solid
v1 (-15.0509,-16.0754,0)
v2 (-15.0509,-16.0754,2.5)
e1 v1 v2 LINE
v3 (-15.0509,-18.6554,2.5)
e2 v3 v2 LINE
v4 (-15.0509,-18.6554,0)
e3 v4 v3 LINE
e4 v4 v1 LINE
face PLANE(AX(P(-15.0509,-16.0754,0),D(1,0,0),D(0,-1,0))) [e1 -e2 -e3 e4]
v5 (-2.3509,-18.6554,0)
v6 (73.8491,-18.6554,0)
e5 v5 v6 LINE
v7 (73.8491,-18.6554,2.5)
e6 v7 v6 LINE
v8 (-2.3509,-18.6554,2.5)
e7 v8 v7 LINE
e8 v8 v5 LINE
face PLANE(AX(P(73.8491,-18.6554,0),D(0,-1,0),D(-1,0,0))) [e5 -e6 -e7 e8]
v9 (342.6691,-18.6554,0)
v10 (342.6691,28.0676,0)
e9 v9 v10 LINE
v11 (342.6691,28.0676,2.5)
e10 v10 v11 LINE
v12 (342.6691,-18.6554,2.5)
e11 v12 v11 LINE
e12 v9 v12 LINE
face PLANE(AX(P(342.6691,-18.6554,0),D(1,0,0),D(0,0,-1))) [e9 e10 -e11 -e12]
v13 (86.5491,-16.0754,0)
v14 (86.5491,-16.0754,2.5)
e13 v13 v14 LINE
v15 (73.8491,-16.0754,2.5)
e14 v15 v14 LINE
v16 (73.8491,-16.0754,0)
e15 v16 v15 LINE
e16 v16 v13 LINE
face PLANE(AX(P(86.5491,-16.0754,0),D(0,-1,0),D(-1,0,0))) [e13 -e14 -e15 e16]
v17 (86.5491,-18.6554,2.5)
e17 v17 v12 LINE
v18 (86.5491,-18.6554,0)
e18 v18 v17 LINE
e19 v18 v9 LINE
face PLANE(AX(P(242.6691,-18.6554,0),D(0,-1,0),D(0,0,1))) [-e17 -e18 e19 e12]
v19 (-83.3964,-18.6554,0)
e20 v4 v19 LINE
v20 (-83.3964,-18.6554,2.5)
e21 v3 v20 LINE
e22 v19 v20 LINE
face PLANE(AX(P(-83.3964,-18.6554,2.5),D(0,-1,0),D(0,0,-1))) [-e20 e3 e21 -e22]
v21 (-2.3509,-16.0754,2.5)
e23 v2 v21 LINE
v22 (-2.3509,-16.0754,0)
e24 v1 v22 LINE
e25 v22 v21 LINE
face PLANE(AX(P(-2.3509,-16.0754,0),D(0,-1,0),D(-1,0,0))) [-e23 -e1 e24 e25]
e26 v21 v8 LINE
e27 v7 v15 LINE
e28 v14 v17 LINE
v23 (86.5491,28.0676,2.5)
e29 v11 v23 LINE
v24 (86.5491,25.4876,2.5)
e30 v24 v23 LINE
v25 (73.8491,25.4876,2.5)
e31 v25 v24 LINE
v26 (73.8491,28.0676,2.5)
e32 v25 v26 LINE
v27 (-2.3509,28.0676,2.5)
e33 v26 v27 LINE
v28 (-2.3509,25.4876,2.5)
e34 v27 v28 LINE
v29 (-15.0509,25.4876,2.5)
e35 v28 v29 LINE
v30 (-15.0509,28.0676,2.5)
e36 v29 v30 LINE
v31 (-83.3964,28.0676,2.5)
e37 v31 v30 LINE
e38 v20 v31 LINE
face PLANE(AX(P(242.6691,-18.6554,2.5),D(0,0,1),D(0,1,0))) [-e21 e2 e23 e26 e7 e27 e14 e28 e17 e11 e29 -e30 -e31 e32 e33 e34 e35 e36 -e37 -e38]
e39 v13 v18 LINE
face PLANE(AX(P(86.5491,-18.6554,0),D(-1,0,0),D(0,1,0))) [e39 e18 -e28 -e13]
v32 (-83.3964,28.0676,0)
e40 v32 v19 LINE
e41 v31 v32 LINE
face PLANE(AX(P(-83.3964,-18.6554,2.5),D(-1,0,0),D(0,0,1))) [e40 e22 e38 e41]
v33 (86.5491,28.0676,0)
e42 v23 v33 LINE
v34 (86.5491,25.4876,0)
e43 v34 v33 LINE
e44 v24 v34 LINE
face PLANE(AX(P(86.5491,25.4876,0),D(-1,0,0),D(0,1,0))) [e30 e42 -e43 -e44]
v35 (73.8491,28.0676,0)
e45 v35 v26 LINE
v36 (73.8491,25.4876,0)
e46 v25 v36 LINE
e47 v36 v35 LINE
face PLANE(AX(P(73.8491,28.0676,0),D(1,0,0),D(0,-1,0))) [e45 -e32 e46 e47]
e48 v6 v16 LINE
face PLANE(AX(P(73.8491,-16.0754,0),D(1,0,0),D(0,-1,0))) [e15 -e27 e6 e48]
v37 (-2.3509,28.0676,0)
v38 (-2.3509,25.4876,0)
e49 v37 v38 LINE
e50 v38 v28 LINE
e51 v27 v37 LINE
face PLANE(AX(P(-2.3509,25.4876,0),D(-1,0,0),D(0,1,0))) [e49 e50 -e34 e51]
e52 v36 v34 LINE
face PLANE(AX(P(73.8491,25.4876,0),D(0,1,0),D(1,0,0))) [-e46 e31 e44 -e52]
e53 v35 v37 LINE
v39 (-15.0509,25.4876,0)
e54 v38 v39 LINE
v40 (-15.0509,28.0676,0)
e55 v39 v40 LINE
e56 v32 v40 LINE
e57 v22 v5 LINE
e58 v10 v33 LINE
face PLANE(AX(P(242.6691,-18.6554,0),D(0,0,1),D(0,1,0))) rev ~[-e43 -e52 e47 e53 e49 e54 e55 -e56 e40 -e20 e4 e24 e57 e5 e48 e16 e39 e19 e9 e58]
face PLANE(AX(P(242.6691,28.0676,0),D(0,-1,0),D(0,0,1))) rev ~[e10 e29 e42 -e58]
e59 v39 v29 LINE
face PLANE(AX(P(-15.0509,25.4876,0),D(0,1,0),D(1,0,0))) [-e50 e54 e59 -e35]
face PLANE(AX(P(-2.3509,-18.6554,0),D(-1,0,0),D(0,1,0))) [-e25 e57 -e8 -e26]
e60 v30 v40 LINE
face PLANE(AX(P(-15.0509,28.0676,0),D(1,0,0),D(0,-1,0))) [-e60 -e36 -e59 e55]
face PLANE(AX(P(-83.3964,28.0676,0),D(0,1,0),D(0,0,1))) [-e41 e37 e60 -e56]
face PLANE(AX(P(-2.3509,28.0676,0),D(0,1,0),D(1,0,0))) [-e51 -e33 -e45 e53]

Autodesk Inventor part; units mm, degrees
ref_plane "YZ Plane" through (0, 0, 0) normal (1, 0, 0) x (0, 1, 0)
ref_plane "XZ Plane" through (0, 0, 0) normal (0, 1, 0) x (-1, 0, 0)
ref_plane "XY Plane" through (0, 0, 0) normal (0, 0, 1) x (1, 0, 0)
sketch "Sketch1" plane through (0, 0, 0) normal (0, 0, 1) x (1, 0, 0)
  line L0 (86.5491, 25.4876) -> (86.5491, 28.0676)
  line L1 (86.5491, 28.0676) -> (86.5491, 25.4876)
  line L2 (73.8491, 25.4876) -> (86.5491, 25.4876)
  line L3 (86.5491, 25.4876) -> (73.8491, 25.4876)
  line L4 (86.5491, 28.0676) -> (217.6691, 28.0676)
  line L5 (217.6691, 28.0676) -> (86.5491, 28.0676)
  line L6 (217.6691, 28.0676) -> (217.6691, -18.6554)
  line L7 (217.6691, -18.6554) -> (217.6691, 28.0676)
  line L8 (86.5491, -18.6554) -> (217.6691, -18.6554)
  line L9 (217.6691, -18.6554) -> (86.5491, -18.6554)
  line L10 (-230.8205, -18.6554) -> (-230.8205, 28.0676)
  line L11 (-230.8205, 28.0676) -> (-230.8205, -18.6554)
  line L12 (-230.8205, 28.0676) -> (-230.8205, -18.6554)
  line L13 (-230.8205, -18.6554) -> (-230.8205, 28.0676)
  line L14 (-15.0509, -16.0754) -> (-15.0509, -18.6554)
  line L15 (-15.0509, -18.6554) -> (-15.0509, -16.0754)
  line L16 (-2.3509, 25.4876) -> (-2.3509, 28.0676)
  line L17 (-2.3509, 28.0676) -> (-2.3509, 25.4876)
  line L18 (-15.0509, 25.4876) -> (-2.3509, 25.4876)
  line L19 (-2.3509, 25.4876) -> (-15.0509, 25.4876)
  line L20 (-15.0509, 28.0676) -> (-15.0509, 25.4876)
  line L21 (-15.0509, 25.4876) -> (-15.0509, 28.0676)
  line L22 (-2.3509, -16.0754) -> (-15.0509, -16.0754)
  line L23 (-15.0509, -16.0754) -> (-2.3509, -16.0754)
  line L24 (-15.0509, 25.4876) -> (-15.0509, 28.0676)
  line L25 (-15.0509, 28.0676) -> (-15.0509, 25.4876)
  line L26 (-15.0509, -18.6554) -> (-15.0509, -16.0754)
  line L27 (-15.0509, -16.0754) -> (-15.0509, -18.6554)
  line L28 (-2.3509, 25.4876) -> (-15.0509, 25.4876)
  line L29 (-15.0509, 25.4876) -> (-2.3509, 25.4876)
  line L30 (-15.0509, -16.0754) -> (-2.3509, -16.0754)
  line L31 (-2.3509, -16.0754) -> (-15.0509, -16.0754)
  line L32 (-230.8205, 28.0676) -> (-15.0509, 28.0676)
  line L33 (-15.0509, 28.0676) -> (-230.8205, 28.0676)
  line L34 (-15.0509, 28.0676) -> (-230.8205, 28.0676)
  line L35 (-230.8205, 28.0676) -> (-15.0509, 28.0676)
  line L36 (-230.8205, -18.6554) -> (-15.0509, -18.6554)
  line L37 (-230.8205, -18.6554) -> (-15.0509, -18.6554)
  line L38 (-15.0509, -18.6554) -> (-230.8205, -18.6554)
  line L39 (-15.0509, -18.6554) -> (-230.8205, -18.6554)
  line L40 (-2.3509, -18.6554) -> (-2.3509, -16.0754)
  line L41 (73.8491, 28.0676) -> (73.8491, 25.4876)
  line L42 (73.8491, 25.4876) -> (73.8491, 28.0676)
  line L43 (-2.3509, 28.0676) -> (73.8491, 28.0676)
  line L44 (73.8491, 28.0676) -> (-2.3509, 28.0676)
  line L45 (86.5491, -18.6554) -> (86.5491, -16.0754)
  line L46 (86.5491, -16.0754) -> (86.5491, -18.6554)
  line L47 (86.5491, -16.0754) -> (73.8491, -16.0754)
  line L48 (73.8491, -16.0754) -> (86.5491, -16.0754)
  line L49 (-2.3509, -16.0754) -> (-2.3509, -18.6554)
  line L50 (-2.3509, 28.0676) -> (-2.3509, 25.4876)
  line L51 (-2.3509, 25.4876) -> (-2.3509, 28.0676)
  line L52 (-2.3509, -16.0754) -> (-2.3509, -18.6554)
  line L53 (-2.3509, -18.6554) -> (-2.3509, -16.0754)
  line L54 (73.8491, -18.6554) -> (-2.3509, -18.6554)
  line L55 (-2.3509, -18.6554) -> (73.8491, -18.6554)
  line L56 (-2.3509, -18.6554) -> (73.8491, -18.6554)
  line L57 (73.8491, -18.6554) -> (-2.3509, -18.6554)
  line L58 (73.8491, 28.0676) -> (-2.3509, 28.0676)
  line L59 (-2.3509, 28.0676) -> (73.8491, 28.0676)
  line L60 (73.8491, -16.0754) -> (73.8491, -18.6554)
  line L61 (73.8491, -18.6554) -> (73.8491, -16.0754)
  line L62 (73.8491, -18.6554) -> (73.8491, -16.0754)
  line L63 (73.8491, -16.0754) -> (73.8491, -18.6554)
  line L64 (73.8491, -16.0754) -> (86.5491, -16.0754)
  line L65 (86.5491, -16.0754) -> (73.8491, -16.0754)
  line L66 (86.5491, 25.4876) -> (73.8491, 25.4876)
  line L67 (73.8491, 25.4876) -> (86.5491, 25.4876)
  line L68 (73.8491, 25.4876) -> (73.8491, 28.0676)
  line L69 (73.8491, 28.0676) -> (73.8491, 25.4876)
  line L70 (86.5491, -16.0754) -> (86.5491, -18.6554)
  line L71 (86.5491, -18.6554) -> (86.5491, -16.0754)
  line L72 (217.6691, 28.0676) -> (86.5491, 28.0676)
  line L73 (86.5491, 28.0676) -> (217.6691, 28.0676)
  line L74 (217.6691, -18.6554) -> (217.6691, 28.0676)
  line L75 (217.6691, 28.0676) -> (217.6691, -18.6554)
  line L76 (86.5491, 28.0676) -> (86.5491, 25.4876)
  line L77 (86.5491, 25.4876) -> (86.5491, 28.0676)
  line L78 (86.5491, -18.6554) -> (217.6691, -18.6554)
  line L79 (217.6691, -18.6554) -> (86.5491, -18.6554)
  point P0 (0, 0)
extrude "Extrusion1" add sketch "Sketch1" along normal blind 2.5
move faces "Move1" translate (23, 0, 0) faces at (217.6691, -3.081, 0.8333)
move faces "Move2" translate (2, 0, 0) faces at (240.6691, 12.4933, 1.6667)
sketch "Sketch2" plane through (0, 0, 2.5) normal (0, 0, 1) x (1, 0, 0)
  line L0 (-83.3964, 28.0676) -> (-230.8205, 28.0676)
  line L1 (-230.8205, 28.0676) -> (-230.8205, -18.6554)
  line L2 (-230.8205, -18.6554) -> (-83.3964, -18.6554)
  line L3 (-83.3964, -18.6554) -> (-83.3964, 28.0676)
extrude "Extrusion2" cut sketch "Sketch2" against normal blind 10
sketch "Sketch4" plane through (-83.3964, -18.6554, 2.5) normal (-1, 0, 0) x (0, 0, 1)
  line L0 (-2.5, 0) -> (-2.5, 46.723) projected
  line L1 (-2.5, 46.723) -> (0, 46.723) projected
  line L2 (0, 46.723) -> (0, 0) projected
  line L3 (0, 0) -> (-2.5, 0) projected
  point P0 (-2.5, 18.6554)
extrude "Extrusion3" add sketch "Sketch4" along normal blind 75
sketch "Sketch5" plane through (242.6691, -18.6554, 0) normal (1, 0, 0) x (0, 0, -1)
  line L0 (-2.5, 0) -> (-2.5, 46.723) projected
  line L1 (0, 46.723) -> (-2.5, 46.723) projected
  line L2 (0, 0) -> (0, 46.723) projected
  line L3 (0, 0) -> (-2.5, 0) projected
  point P0 (0, 18.6554)
extrude "Extrusion4" add sketch "Sketch5" along normal blind 100
sketch "Sketch6" plane through (-158.3964, -18.6554, 2.5) normal (-1, 0, 0) x (0, 0, 1)
  line L0 (-2.5, 46.723) -> (-2.5, 0) projected
  line L1 (0, 0) -> (0, 46.723) projected
  line L2 (0, 46.723) -> (-2.5, 46.723) projected
  line L3 (-2.5, 0) -> (0, 0) projected
  point P0 (-2.5, 18.6554)
extrude "Extrusion5" cut sketch "Sketch6" against normal blind 75
properties part number "New base"
